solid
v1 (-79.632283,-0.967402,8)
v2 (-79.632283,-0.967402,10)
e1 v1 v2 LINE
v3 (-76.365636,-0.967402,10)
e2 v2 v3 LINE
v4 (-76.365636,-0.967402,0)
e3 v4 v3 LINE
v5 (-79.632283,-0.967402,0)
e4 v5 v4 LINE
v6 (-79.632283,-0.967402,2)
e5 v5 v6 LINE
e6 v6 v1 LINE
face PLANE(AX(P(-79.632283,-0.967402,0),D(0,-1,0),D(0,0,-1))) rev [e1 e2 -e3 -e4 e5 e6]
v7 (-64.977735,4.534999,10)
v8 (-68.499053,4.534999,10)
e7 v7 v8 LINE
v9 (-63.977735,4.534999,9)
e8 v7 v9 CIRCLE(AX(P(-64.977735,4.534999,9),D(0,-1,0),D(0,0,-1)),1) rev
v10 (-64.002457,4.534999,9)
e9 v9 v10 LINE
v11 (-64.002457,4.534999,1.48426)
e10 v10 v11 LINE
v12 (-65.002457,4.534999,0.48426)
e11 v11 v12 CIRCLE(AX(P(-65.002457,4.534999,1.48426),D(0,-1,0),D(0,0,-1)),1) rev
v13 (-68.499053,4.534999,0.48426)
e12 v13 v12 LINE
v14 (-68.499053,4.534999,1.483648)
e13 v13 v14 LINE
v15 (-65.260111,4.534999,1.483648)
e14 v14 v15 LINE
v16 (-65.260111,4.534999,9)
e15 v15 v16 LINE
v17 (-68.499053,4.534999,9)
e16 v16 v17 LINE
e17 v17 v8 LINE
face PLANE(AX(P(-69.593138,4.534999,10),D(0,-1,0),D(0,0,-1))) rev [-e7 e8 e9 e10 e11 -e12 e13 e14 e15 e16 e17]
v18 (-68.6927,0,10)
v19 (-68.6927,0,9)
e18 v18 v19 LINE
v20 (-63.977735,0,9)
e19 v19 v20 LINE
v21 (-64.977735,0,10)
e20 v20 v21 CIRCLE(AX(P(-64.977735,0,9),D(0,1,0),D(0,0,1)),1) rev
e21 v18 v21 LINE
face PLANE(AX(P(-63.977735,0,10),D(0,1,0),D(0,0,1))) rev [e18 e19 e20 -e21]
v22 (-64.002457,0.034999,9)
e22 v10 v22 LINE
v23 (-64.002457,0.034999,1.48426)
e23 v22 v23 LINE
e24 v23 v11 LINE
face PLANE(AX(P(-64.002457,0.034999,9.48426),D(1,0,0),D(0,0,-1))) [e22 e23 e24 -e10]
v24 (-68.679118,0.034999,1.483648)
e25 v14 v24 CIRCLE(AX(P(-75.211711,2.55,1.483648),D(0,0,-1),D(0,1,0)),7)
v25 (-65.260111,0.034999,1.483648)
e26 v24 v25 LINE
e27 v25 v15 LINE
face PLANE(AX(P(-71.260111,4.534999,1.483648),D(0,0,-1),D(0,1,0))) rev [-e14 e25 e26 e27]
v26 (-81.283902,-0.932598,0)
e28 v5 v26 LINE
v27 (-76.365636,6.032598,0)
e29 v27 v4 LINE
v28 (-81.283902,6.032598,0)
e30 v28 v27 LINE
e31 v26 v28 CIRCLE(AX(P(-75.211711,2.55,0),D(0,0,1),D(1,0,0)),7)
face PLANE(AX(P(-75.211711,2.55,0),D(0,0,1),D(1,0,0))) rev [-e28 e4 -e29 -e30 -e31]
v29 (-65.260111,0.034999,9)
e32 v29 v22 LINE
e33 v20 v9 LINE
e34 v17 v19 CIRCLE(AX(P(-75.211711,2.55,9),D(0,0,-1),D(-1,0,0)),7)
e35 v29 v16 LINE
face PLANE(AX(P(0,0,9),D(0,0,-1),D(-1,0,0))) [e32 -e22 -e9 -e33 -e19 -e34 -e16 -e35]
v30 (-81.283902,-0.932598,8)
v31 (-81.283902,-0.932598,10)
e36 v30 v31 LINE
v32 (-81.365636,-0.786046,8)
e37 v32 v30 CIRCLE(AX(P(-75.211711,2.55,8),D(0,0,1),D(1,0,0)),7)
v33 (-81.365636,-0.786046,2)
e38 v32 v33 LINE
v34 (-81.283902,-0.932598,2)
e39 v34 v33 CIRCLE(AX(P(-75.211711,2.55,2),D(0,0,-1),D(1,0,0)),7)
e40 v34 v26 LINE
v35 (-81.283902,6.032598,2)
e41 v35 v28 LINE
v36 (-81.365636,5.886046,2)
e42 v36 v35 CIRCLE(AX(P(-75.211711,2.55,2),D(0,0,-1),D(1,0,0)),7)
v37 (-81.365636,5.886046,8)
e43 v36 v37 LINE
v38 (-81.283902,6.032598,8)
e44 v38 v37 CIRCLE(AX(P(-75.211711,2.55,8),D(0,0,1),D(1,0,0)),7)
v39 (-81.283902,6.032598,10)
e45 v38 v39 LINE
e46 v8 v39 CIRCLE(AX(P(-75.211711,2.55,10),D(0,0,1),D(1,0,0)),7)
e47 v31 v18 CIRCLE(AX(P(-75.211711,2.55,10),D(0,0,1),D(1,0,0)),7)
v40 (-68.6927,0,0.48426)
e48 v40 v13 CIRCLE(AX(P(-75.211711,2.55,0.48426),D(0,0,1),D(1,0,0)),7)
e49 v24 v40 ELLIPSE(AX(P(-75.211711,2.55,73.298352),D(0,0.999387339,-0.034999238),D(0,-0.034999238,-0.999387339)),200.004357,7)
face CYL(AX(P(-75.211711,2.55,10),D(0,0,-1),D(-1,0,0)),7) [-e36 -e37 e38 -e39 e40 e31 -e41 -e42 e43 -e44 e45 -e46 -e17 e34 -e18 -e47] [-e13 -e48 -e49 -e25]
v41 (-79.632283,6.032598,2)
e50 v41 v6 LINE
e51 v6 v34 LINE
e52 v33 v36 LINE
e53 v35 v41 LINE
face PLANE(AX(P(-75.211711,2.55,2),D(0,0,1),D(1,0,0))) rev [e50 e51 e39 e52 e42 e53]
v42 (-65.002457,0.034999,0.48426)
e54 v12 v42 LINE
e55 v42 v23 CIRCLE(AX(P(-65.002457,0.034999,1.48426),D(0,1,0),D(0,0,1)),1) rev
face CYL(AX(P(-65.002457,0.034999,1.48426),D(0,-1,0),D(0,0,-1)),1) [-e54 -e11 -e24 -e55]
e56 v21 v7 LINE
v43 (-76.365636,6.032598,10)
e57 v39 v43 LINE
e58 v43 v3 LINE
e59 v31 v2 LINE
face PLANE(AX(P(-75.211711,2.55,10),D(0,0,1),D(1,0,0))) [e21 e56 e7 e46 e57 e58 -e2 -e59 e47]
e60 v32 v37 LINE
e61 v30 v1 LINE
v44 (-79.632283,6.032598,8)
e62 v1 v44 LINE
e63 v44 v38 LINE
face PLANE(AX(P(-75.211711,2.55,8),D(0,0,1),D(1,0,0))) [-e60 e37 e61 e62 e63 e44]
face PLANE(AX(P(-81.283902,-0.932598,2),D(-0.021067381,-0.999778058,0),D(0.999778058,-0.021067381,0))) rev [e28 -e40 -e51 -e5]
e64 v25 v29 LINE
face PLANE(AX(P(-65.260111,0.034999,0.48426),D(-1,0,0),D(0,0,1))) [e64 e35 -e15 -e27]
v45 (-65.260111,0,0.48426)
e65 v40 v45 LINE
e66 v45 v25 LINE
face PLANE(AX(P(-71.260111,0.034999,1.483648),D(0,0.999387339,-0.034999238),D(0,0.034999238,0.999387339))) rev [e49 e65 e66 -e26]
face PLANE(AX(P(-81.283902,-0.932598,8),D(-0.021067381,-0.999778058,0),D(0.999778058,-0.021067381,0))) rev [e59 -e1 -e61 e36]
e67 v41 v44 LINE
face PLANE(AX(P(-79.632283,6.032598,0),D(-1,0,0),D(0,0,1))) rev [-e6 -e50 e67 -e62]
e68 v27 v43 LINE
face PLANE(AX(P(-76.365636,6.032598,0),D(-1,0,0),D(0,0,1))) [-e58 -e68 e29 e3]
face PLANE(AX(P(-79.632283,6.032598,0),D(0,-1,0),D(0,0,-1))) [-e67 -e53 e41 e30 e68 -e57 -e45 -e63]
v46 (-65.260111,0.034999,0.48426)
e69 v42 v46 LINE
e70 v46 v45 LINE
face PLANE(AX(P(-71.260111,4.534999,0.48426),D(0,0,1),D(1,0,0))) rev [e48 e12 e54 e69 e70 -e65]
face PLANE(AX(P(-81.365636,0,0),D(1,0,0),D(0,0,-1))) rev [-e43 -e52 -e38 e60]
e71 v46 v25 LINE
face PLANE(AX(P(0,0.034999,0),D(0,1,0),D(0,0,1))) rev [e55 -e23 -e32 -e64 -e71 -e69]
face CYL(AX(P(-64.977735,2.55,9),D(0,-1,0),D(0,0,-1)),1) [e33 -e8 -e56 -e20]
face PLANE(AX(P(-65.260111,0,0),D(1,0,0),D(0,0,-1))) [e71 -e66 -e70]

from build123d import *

# Parameters (mm, degrees)
SKETCH_1_R          = 7
EXTRUDE_1_DEPTH     = 10
SKETCH_9_W          = 5.615402883
SKETCH_9_H          = 4.534999238
EXTRUDE_6_DEPTH     = 1
SKETCH_11_W         = 1.257653538
SKETCH_11_H         = 9
EXTRUDE_7_DEPTH     = 4.5
EXTRUDE_8_DEPTH     = 6
FILLET_8_R          = 1
FILLET_9_R          = 1
SKETCH_14_W         = 3.266646727
SKETCH_14_H         = 7
CUT_EXTRUDE_1_DEPTH = 10
CUT_EXTRUDE_START   = -2
CUT_EXTRUDE_2_DEPTH = 2
CUT_EXTRUDE_3_DEPTH = 2
SKETCH_17_W         = 6
SKETCH_17_H         = 6.96519698
CUT_EXTRUDE_5_DEPTH = 2


with BuildPart() as part:
    # 草圖1 → 填料-伸長1 (new body)
    with BuildSketch(Plane(origin=(0.382706605, 0, 0), x_dir=(1, 0, 0), z_dir=(0, 0, 1))):
        with Locations((-75.594417438, 2.55)):
            Circle(SKETCH_1_R)
    extrude(amount=EXTRUDE_1_DEPTH)

    # 草圖9 → 填料-伸長6 (add)
    with BuildSketch(Plane(origin=(8.106794936, 0, 9), x_dir=(1, 0, 0), z_dir=(0, 0, 1))):
        with Locations((-74.892231202, 2.267499619)):
            Rectangle(SKETCH_9_W, SKETCH_9_H)
    extrude(amount=EXTRUDE_6_DEPTH)



with BuildPart() as body_2:
    # 草圖11 → 填料-伸長7 (new body)
    with BuildSketch(Plane(origin=(11.553490323, 4.534999238, 0.48426017), x_dir=(1, 0, 0), z_dir=(0, 1, 0))):
        with Locations((-76.184774061, -4.5)):
            Rectangle(SKETCH_11_W, SKETCH_11_H)
    extrude(amount=-EXTRUDE_7_DEPTH)


with BuildPart() as part_1:
    add(part.part)

    add(body_2.part)  # 填料-伸長8 merges body 2
    # 草圖12 → 填料-伸長8 (add)
    with BuildSketch(Plane.ZY.offset(65.260110507)):
        Polygon((0.48426017, 4.534999238), (0.48426017, 0), (1.483647509, 0.034999238), (1.483647509, 4.534999238), align=None)
    extrude(amount=EXTRUDE_8_DEPTH)

    # 圓角8
    fillet_8_edges = [part_1.edges().sort_by_distance(p)[0] for p in [
        (-64.002456969, 2.284999238, 0.48426017),
    ]]
    fillet(fillet_8_edges, radius=FILLET_8_R)

    # 圓角9
    fillet_9_edges = [part_1.edges().sort_by_distance(p)[0] for p in [
        (-63.977734824, 2.267499619, 10),
    ]]
    fillet(fillet_9_edges, radius=FILLET_9_R - 0.0001)  # a hair under: the kernel refuses the full size

    # 草圖14 → 除料-伸長1 (cut)
    with BuildSketch(Plane.XY.offset(10)):
        with Locations((-77.998959421, 2.53259849)):
            Rectangle(SKETCH_14_W, SKETCH_14_H)
    extrude(amount=-CUT_EXTRUDE_1_DEPTH, mode=Mode.SUBTRACT)

    # 草圖15 → 除料-伸長2 (cut)
    with BuildSketch(Plane.XY.offset(10).offset(CUT_EXTRUDE_START)):
        with BuildLine():
            Line((-79.632282784, 6.03259849), (-81.28390218, 6.03259849))
            ThreePointArc((-81.28390218, 6.03259849), (-82.211710833, 2.55), (-81.28390218, -0.93259849))
            Line((-81.28390218, -0.93259849), (-79.632282784, -0.96740151))
            Line((-79.632282784, -0.96740151), (-79.632282784, 6.03259849))
        make_face()
    extrude(amount=CUT_EXTRUDE_2_DEPTH, mode=Mode.SUBTRACT)

    # 草圖16 → 除料-伸長3 (cut)
    with BuildSketch(Plane(origin=(0, 0, 0), x_dir=(-1, 0, 0), z_dir=(0, 0, -1))):
        with BuildLine():
            Line((79.632282784, 6.03259849), (81.28390218, 6.03259849))
            ThreePointArc((81.28390218, 6.03259849), (82.211710833, 2.55), (81.28390218, -0.93259849))
            Line((81.28390218, -0.93259849), (79.632282784, -0.96740151))
            Line((79.632282784, -0.96740151), (79.632282784, 6.03259849))
        make_face()
    extrude(amount=-CUT_EXTRUDE_3_DEPTH, mode=Mode.SUBTRACT)

    # 草圖17 → 除料-伸長5 (cut)
    with BuildSketch(Plane.ZY.offset(83.365636057)):
        with Locations((5, 2.55)):
            Rectangle(SKETCH_17_W, SKETCH_17_H)
    extrude(amount=-CUT_EXTRUDE_5_DEPTH, mode=Mode.SUBTRACT)


solid = part_1.part
